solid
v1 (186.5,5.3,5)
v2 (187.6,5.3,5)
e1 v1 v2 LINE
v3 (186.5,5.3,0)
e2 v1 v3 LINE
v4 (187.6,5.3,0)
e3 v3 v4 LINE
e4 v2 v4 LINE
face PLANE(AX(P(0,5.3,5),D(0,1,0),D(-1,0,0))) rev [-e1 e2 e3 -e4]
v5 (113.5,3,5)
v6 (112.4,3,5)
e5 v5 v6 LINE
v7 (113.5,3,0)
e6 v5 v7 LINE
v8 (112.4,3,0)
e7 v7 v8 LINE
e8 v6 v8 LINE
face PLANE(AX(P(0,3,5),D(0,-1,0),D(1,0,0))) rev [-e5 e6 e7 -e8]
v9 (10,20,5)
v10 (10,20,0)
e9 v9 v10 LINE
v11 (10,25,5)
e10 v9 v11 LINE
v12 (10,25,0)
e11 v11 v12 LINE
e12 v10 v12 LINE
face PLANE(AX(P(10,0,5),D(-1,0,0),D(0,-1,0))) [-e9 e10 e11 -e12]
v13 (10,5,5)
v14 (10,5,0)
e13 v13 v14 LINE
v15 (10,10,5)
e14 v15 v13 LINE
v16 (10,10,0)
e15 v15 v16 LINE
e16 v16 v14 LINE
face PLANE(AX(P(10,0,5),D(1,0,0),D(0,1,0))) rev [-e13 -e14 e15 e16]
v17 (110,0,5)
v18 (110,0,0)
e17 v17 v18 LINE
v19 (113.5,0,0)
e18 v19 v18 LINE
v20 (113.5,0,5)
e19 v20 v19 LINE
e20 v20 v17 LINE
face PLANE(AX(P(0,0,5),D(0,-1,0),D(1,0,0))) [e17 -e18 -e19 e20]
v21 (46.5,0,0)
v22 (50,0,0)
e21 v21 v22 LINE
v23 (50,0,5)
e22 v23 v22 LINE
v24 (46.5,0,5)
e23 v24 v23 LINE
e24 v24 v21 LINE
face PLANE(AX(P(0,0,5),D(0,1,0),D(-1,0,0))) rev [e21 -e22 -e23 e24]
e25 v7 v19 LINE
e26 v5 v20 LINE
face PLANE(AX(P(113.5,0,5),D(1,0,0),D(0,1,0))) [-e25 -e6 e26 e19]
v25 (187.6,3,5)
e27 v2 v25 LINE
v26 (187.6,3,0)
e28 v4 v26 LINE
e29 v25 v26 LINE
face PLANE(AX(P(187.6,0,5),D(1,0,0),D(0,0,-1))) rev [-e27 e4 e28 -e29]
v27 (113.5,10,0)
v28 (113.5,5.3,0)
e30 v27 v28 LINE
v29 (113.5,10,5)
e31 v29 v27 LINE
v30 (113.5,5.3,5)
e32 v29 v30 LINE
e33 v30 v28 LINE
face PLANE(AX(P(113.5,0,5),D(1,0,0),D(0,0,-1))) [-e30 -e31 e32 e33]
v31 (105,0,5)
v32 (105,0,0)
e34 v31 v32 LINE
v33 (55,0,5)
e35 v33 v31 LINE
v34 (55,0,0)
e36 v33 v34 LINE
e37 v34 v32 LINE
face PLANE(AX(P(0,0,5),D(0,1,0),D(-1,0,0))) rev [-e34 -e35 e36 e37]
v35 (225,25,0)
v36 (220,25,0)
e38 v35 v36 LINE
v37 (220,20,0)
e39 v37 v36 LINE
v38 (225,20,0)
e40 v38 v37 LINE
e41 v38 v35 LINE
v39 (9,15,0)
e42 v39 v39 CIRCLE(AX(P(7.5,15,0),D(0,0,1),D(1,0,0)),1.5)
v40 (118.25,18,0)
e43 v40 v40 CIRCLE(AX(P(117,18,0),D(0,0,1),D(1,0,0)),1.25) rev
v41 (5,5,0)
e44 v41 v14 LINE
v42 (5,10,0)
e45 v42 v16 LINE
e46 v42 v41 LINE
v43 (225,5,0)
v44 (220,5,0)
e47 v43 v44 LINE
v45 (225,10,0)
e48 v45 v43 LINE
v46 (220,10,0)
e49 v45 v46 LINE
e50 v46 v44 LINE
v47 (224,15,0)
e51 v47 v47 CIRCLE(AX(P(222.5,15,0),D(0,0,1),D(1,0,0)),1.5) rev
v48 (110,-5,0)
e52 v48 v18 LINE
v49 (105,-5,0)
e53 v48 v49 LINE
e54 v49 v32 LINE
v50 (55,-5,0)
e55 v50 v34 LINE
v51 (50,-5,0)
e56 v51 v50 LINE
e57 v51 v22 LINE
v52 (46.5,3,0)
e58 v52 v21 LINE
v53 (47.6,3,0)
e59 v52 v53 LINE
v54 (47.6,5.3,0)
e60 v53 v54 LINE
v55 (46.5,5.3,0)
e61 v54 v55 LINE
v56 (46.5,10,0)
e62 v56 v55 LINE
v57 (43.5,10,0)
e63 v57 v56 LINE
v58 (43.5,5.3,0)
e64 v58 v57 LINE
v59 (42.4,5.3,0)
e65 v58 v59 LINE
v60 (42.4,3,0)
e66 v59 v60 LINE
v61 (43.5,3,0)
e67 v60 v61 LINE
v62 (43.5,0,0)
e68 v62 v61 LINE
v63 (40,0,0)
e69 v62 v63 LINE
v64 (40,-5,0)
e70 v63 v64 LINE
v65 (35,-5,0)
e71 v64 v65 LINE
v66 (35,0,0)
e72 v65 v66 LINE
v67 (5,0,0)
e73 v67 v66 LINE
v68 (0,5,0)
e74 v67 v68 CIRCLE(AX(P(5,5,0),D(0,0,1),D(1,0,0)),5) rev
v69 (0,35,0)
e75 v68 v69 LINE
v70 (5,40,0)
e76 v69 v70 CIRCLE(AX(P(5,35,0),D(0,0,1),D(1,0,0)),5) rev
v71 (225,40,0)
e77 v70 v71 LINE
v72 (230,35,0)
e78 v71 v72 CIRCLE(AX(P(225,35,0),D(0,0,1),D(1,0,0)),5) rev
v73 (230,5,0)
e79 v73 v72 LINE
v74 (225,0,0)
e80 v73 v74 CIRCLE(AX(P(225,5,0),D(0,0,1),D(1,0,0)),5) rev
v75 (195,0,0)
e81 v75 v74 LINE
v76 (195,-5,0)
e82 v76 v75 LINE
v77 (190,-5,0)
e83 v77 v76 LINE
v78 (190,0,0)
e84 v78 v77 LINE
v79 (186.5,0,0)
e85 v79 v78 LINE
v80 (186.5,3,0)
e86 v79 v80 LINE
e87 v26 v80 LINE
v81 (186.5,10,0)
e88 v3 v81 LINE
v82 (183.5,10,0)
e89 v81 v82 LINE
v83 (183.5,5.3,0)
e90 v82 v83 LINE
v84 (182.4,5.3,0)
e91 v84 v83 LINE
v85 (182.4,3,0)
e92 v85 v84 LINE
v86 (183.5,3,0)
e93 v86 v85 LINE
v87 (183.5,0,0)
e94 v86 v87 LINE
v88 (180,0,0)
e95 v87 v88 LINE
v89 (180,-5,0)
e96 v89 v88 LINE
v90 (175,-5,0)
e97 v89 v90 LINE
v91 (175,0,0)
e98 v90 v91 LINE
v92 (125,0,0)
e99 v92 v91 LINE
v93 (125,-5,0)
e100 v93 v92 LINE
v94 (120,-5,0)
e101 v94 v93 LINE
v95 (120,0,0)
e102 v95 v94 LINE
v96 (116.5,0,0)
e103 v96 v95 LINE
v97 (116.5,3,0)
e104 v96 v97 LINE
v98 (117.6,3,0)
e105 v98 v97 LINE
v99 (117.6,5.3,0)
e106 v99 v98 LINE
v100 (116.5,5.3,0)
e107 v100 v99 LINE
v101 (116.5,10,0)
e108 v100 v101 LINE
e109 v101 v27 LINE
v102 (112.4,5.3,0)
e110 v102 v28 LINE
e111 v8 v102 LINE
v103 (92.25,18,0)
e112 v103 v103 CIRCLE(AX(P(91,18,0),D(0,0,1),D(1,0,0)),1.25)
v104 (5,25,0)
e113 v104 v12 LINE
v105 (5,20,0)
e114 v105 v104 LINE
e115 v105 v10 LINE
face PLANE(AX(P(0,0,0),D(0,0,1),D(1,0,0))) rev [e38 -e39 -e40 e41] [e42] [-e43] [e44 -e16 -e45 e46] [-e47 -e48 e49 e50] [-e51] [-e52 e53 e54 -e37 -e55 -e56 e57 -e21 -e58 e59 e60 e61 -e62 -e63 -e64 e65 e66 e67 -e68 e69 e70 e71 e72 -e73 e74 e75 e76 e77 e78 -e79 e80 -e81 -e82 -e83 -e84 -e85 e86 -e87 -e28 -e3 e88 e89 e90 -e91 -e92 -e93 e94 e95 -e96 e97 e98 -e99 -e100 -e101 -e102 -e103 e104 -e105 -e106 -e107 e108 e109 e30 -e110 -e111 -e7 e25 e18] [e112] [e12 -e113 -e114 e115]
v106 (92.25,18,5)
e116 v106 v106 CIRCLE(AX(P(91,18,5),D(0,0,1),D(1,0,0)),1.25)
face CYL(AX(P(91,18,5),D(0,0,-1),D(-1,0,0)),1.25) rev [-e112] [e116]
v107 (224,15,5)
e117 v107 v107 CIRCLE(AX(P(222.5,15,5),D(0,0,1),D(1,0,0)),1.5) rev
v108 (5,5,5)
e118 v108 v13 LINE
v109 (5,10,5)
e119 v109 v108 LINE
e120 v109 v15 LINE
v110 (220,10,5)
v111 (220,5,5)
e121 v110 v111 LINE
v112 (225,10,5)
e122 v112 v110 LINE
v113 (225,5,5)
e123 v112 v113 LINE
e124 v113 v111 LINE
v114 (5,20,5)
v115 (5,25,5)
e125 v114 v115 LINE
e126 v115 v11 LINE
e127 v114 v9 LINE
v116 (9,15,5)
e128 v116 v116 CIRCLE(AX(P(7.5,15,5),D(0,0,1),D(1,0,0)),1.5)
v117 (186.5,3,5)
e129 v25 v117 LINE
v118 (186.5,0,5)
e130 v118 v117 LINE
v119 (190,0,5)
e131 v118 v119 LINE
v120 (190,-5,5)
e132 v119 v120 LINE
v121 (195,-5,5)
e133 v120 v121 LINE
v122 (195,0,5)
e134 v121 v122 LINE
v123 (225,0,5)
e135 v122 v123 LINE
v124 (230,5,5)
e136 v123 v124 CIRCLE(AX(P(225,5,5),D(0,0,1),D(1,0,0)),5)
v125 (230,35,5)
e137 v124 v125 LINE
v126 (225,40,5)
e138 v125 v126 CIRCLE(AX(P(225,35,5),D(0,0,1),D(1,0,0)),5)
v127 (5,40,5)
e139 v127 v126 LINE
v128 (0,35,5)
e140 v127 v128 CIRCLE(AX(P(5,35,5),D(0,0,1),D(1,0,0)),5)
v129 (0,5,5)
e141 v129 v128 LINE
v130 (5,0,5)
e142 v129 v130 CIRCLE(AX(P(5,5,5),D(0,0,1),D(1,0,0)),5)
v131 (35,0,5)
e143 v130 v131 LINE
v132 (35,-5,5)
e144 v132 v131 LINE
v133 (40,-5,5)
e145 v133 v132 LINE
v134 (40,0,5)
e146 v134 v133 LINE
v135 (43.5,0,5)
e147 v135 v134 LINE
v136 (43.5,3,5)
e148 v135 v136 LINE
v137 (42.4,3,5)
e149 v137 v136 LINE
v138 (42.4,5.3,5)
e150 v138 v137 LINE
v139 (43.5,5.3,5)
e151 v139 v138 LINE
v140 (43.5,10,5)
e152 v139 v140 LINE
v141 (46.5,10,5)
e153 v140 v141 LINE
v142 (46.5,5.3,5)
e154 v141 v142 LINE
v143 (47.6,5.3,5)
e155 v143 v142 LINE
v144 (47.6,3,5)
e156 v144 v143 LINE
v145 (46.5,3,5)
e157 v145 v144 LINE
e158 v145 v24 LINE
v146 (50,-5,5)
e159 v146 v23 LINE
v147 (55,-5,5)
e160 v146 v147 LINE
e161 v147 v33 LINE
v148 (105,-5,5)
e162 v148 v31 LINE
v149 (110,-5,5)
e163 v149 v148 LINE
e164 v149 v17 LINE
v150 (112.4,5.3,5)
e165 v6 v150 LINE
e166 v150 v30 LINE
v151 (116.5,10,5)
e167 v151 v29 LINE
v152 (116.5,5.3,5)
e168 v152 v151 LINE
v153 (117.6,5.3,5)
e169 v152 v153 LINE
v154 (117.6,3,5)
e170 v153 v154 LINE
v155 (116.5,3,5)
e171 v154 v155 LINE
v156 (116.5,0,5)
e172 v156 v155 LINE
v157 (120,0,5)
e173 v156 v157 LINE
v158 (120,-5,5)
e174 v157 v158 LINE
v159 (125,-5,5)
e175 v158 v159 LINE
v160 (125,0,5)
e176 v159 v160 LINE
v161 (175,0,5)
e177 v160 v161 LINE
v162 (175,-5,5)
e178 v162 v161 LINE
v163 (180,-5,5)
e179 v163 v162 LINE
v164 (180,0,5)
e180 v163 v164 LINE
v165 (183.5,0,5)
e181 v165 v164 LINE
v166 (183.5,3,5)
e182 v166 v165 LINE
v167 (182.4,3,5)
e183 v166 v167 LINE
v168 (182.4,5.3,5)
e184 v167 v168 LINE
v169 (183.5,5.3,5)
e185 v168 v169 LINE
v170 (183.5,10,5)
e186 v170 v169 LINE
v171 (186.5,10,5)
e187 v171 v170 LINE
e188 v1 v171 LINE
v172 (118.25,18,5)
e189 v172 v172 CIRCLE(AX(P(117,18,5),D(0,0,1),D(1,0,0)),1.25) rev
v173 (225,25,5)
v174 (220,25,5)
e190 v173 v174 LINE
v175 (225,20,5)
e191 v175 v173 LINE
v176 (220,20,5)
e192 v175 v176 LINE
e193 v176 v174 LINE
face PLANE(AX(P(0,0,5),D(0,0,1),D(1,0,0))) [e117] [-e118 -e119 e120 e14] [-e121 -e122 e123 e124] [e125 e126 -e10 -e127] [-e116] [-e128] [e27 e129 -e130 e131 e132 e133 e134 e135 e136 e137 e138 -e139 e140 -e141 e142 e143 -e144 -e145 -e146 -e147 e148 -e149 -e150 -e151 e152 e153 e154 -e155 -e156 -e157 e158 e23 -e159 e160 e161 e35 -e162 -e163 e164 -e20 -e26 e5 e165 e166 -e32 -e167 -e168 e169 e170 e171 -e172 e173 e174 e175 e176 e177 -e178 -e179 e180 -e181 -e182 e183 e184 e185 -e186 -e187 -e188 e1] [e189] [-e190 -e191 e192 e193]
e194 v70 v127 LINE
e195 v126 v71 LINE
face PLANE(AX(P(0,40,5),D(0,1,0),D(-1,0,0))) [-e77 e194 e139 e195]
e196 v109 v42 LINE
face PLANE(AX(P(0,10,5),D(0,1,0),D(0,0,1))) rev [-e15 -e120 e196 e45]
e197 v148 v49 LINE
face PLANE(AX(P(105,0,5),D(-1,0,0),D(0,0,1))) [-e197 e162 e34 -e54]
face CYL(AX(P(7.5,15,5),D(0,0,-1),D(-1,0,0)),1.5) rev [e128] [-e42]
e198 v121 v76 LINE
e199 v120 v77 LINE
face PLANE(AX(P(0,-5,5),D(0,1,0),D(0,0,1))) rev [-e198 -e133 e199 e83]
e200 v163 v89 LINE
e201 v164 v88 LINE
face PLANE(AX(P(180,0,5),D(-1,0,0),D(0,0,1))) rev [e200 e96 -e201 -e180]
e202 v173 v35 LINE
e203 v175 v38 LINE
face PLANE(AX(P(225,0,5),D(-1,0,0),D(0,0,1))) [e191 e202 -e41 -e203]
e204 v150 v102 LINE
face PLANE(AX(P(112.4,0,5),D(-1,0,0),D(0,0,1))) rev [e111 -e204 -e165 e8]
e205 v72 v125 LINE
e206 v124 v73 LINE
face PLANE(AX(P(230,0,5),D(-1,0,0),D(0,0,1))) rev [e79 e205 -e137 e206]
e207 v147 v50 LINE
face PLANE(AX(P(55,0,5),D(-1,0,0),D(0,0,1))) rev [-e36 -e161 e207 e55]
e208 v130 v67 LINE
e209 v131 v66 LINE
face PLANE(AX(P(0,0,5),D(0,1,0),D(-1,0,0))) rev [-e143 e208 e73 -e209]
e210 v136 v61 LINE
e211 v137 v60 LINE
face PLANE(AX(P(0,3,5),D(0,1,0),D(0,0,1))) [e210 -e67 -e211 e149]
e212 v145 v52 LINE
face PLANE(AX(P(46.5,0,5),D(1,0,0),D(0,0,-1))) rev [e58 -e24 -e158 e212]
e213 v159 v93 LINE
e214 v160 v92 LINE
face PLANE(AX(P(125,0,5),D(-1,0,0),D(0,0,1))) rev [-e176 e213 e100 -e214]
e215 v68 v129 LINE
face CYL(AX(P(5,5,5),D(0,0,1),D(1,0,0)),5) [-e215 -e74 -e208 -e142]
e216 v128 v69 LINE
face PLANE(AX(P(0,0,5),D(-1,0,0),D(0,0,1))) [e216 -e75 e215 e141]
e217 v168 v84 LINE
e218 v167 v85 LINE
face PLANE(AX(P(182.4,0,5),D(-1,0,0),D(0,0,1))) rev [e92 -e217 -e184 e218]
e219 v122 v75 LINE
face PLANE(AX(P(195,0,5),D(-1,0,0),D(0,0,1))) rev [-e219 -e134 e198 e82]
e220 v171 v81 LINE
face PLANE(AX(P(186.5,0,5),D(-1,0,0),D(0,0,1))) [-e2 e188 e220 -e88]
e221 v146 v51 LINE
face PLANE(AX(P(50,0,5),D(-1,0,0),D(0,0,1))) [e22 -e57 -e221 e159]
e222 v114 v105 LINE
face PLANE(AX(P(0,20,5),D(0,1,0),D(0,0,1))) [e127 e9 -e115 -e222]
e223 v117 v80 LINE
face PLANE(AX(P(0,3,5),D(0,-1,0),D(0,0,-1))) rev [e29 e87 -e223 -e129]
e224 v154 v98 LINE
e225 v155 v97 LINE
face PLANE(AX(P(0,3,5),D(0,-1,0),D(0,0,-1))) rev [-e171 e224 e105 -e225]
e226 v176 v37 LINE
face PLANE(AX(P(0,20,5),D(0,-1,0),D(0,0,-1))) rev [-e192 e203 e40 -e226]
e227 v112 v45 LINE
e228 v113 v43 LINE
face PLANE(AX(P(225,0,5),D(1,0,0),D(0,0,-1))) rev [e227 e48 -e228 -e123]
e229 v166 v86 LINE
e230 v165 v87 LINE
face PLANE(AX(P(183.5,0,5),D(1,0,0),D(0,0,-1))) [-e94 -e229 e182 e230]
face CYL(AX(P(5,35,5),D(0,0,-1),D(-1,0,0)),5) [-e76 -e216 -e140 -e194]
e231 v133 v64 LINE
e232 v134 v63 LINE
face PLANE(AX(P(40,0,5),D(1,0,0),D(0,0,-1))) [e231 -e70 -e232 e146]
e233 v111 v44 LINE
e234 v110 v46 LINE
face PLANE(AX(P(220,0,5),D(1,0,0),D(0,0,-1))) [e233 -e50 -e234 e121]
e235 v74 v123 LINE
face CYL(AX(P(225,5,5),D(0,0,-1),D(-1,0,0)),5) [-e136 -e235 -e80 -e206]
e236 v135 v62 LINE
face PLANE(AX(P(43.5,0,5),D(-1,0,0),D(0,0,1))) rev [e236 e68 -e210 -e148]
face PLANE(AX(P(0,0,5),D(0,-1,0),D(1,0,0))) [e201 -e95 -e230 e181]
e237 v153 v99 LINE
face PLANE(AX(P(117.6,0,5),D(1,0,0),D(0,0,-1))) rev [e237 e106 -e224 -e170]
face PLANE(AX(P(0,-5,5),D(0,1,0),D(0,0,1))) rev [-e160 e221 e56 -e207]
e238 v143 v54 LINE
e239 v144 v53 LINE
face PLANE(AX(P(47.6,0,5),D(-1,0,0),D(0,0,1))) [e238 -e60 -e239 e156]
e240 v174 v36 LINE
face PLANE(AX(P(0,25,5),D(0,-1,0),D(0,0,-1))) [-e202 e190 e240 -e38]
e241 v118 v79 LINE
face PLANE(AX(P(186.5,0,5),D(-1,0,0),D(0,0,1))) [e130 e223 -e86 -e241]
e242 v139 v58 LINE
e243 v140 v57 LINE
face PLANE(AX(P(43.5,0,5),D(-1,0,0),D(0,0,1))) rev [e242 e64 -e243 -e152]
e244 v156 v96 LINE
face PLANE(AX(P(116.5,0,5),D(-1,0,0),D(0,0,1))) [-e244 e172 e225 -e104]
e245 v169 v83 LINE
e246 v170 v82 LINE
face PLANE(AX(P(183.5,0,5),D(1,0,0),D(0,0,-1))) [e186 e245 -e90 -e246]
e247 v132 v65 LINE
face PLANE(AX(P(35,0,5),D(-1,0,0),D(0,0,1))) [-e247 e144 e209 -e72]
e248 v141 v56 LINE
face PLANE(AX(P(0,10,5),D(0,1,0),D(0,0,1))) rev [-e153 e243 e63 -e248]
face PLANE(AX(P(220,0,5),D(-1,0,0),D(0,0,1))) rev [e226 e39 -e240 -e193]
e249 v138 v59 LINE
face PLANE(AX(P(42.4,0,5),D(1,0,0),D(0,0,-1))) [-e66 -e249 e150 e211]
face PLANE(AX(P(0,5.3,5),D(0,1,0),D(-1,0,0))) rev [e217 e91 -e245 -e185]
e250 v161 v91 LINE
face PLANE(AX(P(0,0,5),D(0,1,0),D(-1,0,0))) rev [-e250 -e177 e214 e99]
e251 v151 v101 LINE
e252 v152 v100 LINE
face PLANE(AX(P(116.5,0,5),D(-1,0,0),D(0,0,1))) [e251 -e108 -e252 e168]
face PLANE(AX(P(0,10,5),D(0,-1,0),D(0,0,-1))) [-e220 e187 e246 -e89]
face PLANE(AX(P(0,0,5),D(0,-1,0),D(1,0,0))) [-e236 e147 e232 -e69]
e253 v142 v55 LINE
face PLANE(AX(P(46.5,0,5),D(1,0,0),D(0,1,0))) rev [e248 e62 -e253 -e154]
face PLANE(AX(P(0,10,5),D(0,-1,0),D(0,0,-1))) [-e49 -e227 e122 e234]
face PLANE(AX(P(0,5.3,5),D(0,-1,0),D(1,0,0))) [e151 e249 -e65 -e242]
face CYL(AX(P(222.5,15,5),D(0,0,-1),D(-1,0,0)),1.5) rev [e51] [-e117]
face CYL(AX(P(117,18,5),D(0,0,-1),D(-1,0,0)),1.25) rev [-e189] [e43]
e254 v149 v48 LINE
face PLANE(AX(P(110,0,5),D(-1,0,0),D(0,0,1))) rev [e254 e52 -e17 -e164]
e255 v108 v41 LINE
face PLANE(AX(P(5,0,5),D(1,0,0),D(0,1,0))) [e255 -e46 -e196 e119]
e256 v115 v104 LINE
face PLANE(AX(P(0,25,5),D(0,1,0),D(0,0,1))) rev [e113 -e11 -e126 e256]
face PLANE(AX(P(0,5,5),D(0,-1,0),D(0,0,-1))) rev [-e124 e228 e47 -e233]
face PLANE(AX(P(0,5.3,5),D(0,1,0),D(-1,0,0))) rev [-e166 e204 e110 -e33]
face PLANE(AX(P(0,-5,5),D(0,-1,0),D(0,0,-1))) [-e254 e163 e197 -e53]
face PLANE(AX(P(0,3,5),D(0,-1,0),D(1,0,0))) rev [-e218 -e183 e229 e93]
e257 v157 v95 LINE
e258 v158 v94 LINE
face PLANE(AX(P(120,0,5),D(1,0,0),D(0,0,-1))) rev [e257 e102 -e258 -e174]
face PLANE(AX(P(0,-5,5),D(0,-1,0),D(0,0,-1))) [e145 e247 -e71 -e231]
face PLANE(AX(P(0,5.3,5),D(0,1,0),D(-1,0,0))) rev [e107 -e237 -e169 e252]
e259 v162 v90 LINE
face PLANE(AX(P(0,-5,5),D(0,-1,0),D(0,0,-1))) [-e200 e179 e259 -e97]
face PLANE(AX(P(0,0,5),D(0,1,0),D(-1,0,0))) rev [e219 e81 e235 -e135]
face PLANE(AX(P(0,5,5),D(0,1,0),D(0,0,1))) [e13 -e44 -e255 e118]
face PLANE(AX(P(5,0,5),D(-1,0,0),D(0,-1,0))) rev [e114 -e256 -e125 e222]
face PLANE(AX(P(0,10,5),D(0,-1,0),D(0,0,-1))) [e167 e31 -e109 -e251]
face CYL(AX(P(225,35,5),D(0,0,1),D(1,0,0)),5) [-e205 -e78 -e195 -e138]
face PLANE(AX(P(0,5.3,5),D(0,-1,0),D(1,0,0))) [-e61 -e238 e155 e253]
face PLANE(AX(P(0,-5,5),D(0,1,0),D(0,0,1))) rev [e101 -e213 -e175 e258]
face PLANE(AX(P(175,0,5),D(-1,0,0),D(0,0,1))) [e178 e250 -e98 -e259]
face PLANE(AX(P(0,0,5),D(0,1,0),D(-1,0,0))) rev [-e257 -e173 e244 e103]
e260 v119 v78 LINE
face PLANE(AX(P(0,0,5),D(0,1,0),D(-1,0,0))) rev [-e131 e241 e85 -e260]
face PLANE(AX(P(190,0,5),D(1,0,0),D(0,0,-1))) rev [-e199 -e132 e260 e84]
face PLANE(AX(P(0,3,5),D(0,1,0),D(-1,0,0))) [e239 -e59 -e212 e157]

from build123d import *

# Parameters (mm, degrees)
BOSS_EXTRU_1_OUTLINE_W   = 5
BOSS_EXTRU_1_OUTLINE_H   = 5
BOSS_EXTRU_1_OUTLINE_R   = 1.5
BOSS_EXTRU_1_OUTLINE_R_2 = 1.25
BOSS_EXTRU_1_DEPTH       = 5
CONG_1_R                 = 5


# Read off the part's stored shape, not the designer's step: Boss.-Extru.1
with BuildPart() as part:
    # Boss.-Extru.1 outline → Boss.-Extru.1 (new body)
    with BuildSketch(Plane.XY):
        Polygon((47.6, 5.3), (47.6, 3), (46.5, 3), (46.5, 0), (50, 0), (50, -5), (55, -5), (55, 0), (105, 0), (105, -5), (110, -5), (110, 0), (113.5, 0), (113.5, 3), (112.4, 3), (112.4, 5.3), (113.5, 5.3), (113.5, 10), (116.5, 10), (116.5, 5.3), (117.6, 5.3), (117.6, 3), (116.5, 3), (116.5, 0), (120, 0), (120, -5), (125, -5), (125, 0), (175, 0), (175, -5), (180, -5), (180, 0), (183.5, 0), (183.5, 3), (182.4, 3), (182.4, 5.3), (183.5, 5.3), (183.5, 10), (186.5, 10), (186.5, 5.3), (187.6, 5.3), (187.6, 3), (186.5, 3), (186.5, 0), (190, 0), (190, -5), (195, -5), (195, 0), (230, 0), (230, 40), (0, 40), (0, 0), (35, 0), (35, -5), (40, -5), (40, 0), (43.5, 0), (43.5, 3), (42.4, 3), (42.4, 5.3), (43.5, 5.3), (43.5, 10), (46.5, 10), (46.5, 5.3), align=None)
        with Locations((7.5, 7.5)):
            Rectangle(BOSS_EXTRU_1_OUTLINE_W, BOSS_EXTRU_1_OUTLINE_H, mode=Mode.SUBTRACT)
        with Locations((7.5, 15)):
            Circle(BOSS_EXTRU_1_OUTLINE_R, mode=Mode.SUBTRACT)
        with Locations((222.5, 7.5)):
            Rectangle(BOSS_EXTRU_1_OUTLINE_W, BOSS_EXTRU_1_OUTLINE_H, mode=Mode.SUBTRACT)
        with Locations((222.5, 15)):
            Circle(BOSS_EXTRU_1_OUTLINE_R, mode=Mode.SUBTRACT)
        with Locations((7.5, 22.5)):
            Rectangle(BOSS_EXTRU_1_OUTLINE_W, BOSS_EXTRU_1_OUTLINE_H, mode=Mode.SUBTRACT)
        with Locations((91, 18)):
            Circle(BOSS_EXTRU_1_OUTLINE_R_2, mode=Mode.SUBTRACT)
        with Locations((117, 18)):
            Circle(BOSS_EXTRU_1_OUTLINE_R_2, mode=Mode.SUBTRACT)
        with Locations((222.5, 22.5)):
            Rectangle(BOSS_EXTRU_1_OUTLINE_W, BOSS_EXTRU_1_OUTLINE_H, mode=Mode.SUBTRACT)
    extrude(amount=BOSS_EXTRU_1_DEPTH)

    # Congé1
    cong_1_edges = [part.edges().sort_by_distance(p)[0] for p in [
        (0, 0, 2.5),
        (0, 40, 2.5),
        (230, 40, 2.5),
        (230, 0, 2.5),
    ]]
    fillet(cong_1_edges, radius=CONG_1_R)


solid = part.part
